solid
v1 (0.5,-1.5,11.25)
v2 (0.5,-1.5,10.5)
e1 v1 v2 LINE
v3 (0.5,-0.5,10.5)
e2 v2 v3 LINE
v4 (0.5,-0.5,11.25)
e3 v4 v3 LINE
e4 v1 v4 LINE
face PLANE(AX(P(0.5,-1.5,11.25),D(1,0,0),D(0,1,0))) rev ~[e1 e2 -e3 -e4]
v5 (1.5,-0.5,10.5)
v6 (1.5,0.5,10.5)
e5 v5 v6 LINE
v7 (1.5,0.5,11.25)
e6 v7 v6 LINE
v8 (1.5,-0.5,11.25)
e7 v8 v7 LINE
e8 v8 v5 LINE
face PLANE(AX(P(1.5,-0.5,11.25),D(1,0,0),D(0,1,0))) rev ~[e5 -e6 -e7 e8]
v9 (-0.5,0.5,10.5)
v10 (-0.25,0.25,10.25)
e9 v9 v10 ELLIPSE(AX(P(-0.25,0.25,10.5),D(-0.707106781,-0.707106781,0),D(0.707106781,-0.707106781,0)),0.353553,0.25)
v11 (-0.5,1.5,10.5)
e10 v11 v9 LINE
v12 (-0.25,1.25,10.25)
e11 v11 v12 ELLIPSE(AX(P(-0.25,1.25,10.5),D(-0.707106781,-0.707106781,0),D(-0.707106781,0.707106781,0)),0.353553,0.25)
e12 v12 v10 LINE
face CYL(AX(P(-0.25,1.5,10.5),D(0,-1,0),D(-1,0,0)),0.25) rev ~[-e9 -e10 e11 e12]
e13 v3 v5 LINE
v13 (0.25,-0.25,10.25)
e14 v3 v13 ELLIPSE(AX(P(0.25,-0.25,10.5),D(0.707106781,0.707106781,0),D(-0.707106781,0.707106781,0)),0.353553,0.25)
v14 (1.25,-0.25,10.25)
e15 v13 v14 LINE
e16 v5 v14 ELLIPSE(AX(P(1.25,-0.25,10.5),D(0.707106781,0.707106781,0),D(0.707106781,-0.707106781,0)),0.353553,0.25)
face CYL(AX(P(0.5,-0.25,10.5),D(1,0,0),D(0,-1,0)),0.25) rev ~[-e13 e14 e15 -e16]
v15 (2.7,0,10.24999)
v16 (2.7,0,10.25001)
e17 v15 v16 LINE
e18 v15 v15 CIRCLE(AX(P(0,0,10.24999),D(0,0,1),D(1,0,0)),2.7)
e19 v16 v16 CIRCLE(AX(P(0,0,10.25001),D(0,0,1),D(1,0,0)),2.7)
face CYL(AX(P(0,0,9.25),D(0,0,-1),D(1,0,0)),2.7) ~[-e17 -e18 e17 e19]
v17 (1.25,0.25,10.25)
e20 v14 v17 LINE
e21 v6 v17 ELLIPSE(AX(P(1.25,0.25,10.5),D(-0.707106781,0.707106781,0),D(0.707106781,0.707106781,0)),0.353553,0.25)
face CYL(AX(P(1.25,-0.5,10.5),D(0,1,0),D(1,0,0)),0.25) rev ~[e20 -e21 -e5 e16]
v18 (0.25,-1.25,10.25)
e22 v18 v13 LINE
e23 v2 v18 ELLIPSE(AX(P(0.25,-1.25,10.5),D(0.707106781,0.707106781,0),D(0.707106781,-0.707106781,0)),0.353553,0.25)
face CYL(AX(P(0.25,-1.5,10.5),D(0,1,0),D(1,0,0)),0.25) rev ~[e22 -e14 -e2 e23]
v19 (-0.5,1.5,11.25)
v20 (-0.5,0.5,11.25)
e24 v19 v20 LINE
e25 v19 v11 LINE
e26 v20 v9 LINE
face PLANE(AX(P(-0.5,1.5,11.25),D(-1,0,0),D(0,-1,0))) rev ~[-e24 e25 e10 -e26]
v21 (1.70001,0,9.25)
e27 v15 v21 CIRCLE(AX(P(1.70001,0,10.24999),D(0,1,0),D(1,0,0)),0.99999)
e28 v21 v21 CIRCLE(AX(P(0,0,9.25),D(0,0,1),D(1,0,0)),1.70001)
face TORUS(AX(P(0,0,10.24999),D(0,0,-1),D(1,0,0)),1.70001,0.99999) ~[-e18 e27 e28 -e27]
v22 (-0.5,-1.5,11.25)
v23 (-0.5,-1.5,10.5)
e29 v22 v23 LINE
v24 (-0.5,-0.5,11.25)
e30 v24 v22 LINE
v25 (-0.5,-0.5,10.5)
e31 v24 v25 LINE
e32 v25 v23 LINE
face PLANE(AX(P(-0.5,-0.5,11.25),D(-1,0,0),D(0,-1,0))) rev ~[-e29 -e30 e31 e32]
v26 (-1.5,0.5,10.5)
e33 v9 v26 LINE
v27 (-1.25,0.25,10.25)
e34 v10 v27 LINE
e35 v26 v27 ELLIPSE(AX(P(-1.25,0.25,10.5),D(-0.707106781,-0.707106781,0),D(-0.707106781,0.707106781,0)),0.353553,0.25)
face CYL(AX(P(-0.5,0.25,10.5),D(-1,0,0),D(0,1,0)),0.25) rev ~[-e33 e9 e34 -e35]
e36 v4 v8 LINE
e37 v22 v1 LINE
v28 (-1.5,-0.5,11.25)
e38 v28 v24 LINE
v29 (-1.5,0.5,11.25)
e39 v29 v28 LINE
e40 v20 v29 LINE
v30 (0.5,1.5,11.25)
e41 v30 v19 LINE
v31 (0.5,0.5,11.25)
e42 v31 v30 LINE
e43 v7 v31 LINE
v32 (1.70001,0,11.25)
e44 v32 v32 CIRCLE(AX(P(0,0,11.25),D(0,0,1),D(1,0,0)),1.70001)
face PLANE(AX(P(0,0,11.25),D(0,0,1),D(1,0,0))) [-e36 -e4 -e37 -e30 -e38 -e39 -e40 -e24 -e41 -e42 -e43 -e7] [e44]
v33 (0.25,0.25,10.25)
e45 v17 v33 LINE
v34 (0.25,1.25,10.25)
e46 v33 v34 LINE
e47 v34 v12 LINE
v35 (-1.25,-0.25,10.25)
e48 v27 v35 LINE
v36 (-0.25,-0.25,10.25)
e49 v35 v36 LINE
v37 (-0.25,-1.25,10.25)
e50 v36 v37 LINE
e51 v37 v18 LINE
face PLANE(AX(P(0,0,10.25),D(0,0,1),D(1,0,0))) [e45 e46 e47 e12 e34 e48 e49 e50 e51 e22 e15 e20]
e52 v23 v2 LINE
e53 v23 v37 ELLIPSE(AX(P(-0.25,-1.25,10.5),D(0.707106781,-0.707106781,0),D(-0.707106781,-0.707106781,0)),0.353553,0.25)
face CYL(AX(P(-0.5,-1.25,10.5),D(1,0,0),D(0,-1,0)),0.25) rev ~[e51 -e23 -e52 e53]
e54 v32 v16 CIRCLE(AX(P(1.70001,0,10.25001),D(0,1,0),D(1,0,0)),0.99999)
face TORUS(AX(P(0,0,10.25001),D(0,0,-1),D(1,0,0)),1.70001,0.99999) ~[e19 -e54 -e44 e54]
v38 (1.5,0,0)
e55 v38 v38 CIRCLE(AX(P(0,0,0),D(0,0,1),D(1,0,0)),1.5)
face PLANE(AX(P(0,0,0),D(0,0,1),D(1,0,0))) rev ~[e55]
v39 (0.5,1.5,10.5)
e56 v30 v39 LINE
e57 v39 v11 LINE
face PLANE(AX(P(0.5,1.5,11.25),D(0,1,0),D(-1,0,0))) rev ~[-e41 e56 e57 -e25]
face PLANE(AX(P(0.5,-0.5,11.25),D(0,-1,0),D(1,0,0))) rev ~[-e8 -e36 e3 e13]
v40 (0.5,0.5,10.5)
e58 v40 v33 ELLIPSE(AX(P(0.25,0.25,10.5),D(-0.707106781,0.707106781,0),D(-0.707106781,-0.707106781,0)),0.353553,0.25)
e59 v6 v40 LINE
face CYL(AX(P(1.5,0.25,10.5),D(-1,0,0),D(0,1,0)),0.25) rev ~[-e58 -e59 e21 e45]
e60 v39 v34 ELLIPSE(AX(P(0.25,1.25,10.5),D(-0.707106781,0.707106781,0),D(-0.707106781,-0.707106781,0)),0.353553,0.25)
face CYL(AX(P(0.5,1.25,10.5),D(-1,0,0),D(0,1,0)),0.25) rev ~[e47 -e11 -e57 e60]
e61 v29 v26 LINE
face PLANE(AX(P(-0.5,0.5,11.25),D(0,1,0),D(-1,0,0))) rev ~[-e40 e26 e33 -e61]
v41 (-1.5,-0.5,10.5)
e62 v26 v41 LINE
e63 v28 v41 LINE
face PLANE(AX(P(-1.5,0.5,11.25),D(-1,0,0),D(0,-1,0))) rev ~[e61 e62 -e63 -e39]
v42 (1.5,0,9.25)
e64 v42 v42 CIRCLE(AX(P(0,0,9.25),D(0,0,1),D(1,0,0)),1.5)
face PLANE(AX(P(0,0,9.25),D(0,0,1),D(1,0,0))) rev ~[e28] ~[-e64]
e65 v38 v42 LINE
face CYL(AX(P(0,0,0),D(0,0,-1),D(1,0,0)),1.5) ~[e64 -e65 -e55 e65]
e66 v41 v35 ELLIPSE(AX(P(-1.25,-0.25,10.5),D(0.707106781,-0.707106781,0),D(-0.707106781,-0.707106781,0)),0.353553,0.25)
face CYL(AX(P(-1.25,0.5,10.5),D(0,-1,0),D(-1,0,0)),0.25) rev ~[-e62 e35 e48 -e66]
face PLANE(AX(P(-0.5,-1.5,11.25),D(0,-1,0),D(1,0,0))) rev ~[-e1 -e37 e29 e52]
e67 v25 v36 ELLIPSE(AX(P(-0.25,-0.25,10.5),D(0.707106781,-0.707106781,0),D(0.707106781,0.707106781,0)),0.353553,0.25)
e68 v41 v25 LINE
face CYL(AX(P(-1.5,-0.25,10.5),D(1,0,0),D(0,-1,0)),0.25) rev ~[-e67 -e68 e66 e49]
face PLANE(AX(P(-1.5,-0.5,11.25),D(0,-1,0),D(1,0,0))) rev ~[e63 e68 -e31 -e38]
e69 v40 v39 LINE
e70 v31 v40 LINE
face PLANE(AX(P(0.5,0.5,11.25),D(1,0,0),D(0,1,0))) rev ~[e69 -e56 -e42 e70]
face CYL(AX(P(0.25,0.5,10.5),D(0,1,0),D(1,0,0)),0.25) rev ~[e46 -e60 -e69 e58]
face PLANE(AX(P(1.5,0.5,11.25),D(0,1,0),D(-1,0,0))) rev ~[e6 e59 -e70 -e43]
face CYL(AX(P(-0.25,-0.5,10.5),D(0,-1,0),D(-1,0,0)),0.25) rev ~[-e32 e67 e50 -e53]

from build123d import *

# Parameters (mm, degrees)
F0_R     = 1.5
F1_DEPTH = 9.25
F2_R     = 2.7
F3_DEPTH = 2
F5_DEPTH = 1
F6_R     = 0.25
F7_R     = 0.99999


# Not quite as in the source:
# - a fillet or chamfer is up to 0.001 mm smaller than in the source, because OpenCascade refuses the exact size


with BuildPart() as f1:
    # F0 (on Top) → F1 (new body)
    with BuildSketch(Plane.XY):
        Circle(F0_R)
    extrude(amount=F1_DEPTH)

    # F2 (on face) → F3 (join)
    with BuildSketch(Plane.XY.offset(9.25)):
        Circle(F2_R)
    extrude(amount=F3_DEPTH)

    # F4 (on face) → F5 (cut)
    with BuildSketch(Plane.XY.offset(11.25)):
        Polygon((0.5, 1.5), (-0.5, 1.5), (-0.5, 0.5), (-1.5, 0.5), (-1.5, -0.5), (-0.5, -0.5), (-0.5, -1.5), (0.5, -1.5), (0.5, -0.5), (1.5, -0.5), (1.5, 0.5), (0.5, 0.5), align=None)
    extrude(amount=-F5_DEPTH, mode=Mode.SUBTRACT)

    # F6
    f6_edges = [f1.edges().sort_by_distance(p)[0] for p in [
        (0, 1.5, 10.25),
        (-0.5, 1, 10.25),
        (-1, 0.5, 10.25),
        (-1.5, 0, 10.25),
        (-1, -0.5, 10.25),
        (-0.5, -1, 10.25),
        (0, -1.5, 10.25),
        (0.5, -1, 10.25),
        (1, -0.5, 10.25),
        (1.5, 0, 10.25),
        (1, 0.5, 10.25),
        (0.5, 1, 10.25),
    ]]
    fillet(f6_edges, radius=F6_R)

    # F7 (radius 1 in the source; OpenCascade refuses exactly that, so slightly less here)
    f7_edges = [f1.edges().sort_by_distance(p)[0] for p in [
        (2.7, 0, 10.25),
        (-2.7, 0, 9.25),
        (-2.7, 0, 11.25),
    ]]
    fillet(f7_edges, radius=F7_R)


solid = f1.part
